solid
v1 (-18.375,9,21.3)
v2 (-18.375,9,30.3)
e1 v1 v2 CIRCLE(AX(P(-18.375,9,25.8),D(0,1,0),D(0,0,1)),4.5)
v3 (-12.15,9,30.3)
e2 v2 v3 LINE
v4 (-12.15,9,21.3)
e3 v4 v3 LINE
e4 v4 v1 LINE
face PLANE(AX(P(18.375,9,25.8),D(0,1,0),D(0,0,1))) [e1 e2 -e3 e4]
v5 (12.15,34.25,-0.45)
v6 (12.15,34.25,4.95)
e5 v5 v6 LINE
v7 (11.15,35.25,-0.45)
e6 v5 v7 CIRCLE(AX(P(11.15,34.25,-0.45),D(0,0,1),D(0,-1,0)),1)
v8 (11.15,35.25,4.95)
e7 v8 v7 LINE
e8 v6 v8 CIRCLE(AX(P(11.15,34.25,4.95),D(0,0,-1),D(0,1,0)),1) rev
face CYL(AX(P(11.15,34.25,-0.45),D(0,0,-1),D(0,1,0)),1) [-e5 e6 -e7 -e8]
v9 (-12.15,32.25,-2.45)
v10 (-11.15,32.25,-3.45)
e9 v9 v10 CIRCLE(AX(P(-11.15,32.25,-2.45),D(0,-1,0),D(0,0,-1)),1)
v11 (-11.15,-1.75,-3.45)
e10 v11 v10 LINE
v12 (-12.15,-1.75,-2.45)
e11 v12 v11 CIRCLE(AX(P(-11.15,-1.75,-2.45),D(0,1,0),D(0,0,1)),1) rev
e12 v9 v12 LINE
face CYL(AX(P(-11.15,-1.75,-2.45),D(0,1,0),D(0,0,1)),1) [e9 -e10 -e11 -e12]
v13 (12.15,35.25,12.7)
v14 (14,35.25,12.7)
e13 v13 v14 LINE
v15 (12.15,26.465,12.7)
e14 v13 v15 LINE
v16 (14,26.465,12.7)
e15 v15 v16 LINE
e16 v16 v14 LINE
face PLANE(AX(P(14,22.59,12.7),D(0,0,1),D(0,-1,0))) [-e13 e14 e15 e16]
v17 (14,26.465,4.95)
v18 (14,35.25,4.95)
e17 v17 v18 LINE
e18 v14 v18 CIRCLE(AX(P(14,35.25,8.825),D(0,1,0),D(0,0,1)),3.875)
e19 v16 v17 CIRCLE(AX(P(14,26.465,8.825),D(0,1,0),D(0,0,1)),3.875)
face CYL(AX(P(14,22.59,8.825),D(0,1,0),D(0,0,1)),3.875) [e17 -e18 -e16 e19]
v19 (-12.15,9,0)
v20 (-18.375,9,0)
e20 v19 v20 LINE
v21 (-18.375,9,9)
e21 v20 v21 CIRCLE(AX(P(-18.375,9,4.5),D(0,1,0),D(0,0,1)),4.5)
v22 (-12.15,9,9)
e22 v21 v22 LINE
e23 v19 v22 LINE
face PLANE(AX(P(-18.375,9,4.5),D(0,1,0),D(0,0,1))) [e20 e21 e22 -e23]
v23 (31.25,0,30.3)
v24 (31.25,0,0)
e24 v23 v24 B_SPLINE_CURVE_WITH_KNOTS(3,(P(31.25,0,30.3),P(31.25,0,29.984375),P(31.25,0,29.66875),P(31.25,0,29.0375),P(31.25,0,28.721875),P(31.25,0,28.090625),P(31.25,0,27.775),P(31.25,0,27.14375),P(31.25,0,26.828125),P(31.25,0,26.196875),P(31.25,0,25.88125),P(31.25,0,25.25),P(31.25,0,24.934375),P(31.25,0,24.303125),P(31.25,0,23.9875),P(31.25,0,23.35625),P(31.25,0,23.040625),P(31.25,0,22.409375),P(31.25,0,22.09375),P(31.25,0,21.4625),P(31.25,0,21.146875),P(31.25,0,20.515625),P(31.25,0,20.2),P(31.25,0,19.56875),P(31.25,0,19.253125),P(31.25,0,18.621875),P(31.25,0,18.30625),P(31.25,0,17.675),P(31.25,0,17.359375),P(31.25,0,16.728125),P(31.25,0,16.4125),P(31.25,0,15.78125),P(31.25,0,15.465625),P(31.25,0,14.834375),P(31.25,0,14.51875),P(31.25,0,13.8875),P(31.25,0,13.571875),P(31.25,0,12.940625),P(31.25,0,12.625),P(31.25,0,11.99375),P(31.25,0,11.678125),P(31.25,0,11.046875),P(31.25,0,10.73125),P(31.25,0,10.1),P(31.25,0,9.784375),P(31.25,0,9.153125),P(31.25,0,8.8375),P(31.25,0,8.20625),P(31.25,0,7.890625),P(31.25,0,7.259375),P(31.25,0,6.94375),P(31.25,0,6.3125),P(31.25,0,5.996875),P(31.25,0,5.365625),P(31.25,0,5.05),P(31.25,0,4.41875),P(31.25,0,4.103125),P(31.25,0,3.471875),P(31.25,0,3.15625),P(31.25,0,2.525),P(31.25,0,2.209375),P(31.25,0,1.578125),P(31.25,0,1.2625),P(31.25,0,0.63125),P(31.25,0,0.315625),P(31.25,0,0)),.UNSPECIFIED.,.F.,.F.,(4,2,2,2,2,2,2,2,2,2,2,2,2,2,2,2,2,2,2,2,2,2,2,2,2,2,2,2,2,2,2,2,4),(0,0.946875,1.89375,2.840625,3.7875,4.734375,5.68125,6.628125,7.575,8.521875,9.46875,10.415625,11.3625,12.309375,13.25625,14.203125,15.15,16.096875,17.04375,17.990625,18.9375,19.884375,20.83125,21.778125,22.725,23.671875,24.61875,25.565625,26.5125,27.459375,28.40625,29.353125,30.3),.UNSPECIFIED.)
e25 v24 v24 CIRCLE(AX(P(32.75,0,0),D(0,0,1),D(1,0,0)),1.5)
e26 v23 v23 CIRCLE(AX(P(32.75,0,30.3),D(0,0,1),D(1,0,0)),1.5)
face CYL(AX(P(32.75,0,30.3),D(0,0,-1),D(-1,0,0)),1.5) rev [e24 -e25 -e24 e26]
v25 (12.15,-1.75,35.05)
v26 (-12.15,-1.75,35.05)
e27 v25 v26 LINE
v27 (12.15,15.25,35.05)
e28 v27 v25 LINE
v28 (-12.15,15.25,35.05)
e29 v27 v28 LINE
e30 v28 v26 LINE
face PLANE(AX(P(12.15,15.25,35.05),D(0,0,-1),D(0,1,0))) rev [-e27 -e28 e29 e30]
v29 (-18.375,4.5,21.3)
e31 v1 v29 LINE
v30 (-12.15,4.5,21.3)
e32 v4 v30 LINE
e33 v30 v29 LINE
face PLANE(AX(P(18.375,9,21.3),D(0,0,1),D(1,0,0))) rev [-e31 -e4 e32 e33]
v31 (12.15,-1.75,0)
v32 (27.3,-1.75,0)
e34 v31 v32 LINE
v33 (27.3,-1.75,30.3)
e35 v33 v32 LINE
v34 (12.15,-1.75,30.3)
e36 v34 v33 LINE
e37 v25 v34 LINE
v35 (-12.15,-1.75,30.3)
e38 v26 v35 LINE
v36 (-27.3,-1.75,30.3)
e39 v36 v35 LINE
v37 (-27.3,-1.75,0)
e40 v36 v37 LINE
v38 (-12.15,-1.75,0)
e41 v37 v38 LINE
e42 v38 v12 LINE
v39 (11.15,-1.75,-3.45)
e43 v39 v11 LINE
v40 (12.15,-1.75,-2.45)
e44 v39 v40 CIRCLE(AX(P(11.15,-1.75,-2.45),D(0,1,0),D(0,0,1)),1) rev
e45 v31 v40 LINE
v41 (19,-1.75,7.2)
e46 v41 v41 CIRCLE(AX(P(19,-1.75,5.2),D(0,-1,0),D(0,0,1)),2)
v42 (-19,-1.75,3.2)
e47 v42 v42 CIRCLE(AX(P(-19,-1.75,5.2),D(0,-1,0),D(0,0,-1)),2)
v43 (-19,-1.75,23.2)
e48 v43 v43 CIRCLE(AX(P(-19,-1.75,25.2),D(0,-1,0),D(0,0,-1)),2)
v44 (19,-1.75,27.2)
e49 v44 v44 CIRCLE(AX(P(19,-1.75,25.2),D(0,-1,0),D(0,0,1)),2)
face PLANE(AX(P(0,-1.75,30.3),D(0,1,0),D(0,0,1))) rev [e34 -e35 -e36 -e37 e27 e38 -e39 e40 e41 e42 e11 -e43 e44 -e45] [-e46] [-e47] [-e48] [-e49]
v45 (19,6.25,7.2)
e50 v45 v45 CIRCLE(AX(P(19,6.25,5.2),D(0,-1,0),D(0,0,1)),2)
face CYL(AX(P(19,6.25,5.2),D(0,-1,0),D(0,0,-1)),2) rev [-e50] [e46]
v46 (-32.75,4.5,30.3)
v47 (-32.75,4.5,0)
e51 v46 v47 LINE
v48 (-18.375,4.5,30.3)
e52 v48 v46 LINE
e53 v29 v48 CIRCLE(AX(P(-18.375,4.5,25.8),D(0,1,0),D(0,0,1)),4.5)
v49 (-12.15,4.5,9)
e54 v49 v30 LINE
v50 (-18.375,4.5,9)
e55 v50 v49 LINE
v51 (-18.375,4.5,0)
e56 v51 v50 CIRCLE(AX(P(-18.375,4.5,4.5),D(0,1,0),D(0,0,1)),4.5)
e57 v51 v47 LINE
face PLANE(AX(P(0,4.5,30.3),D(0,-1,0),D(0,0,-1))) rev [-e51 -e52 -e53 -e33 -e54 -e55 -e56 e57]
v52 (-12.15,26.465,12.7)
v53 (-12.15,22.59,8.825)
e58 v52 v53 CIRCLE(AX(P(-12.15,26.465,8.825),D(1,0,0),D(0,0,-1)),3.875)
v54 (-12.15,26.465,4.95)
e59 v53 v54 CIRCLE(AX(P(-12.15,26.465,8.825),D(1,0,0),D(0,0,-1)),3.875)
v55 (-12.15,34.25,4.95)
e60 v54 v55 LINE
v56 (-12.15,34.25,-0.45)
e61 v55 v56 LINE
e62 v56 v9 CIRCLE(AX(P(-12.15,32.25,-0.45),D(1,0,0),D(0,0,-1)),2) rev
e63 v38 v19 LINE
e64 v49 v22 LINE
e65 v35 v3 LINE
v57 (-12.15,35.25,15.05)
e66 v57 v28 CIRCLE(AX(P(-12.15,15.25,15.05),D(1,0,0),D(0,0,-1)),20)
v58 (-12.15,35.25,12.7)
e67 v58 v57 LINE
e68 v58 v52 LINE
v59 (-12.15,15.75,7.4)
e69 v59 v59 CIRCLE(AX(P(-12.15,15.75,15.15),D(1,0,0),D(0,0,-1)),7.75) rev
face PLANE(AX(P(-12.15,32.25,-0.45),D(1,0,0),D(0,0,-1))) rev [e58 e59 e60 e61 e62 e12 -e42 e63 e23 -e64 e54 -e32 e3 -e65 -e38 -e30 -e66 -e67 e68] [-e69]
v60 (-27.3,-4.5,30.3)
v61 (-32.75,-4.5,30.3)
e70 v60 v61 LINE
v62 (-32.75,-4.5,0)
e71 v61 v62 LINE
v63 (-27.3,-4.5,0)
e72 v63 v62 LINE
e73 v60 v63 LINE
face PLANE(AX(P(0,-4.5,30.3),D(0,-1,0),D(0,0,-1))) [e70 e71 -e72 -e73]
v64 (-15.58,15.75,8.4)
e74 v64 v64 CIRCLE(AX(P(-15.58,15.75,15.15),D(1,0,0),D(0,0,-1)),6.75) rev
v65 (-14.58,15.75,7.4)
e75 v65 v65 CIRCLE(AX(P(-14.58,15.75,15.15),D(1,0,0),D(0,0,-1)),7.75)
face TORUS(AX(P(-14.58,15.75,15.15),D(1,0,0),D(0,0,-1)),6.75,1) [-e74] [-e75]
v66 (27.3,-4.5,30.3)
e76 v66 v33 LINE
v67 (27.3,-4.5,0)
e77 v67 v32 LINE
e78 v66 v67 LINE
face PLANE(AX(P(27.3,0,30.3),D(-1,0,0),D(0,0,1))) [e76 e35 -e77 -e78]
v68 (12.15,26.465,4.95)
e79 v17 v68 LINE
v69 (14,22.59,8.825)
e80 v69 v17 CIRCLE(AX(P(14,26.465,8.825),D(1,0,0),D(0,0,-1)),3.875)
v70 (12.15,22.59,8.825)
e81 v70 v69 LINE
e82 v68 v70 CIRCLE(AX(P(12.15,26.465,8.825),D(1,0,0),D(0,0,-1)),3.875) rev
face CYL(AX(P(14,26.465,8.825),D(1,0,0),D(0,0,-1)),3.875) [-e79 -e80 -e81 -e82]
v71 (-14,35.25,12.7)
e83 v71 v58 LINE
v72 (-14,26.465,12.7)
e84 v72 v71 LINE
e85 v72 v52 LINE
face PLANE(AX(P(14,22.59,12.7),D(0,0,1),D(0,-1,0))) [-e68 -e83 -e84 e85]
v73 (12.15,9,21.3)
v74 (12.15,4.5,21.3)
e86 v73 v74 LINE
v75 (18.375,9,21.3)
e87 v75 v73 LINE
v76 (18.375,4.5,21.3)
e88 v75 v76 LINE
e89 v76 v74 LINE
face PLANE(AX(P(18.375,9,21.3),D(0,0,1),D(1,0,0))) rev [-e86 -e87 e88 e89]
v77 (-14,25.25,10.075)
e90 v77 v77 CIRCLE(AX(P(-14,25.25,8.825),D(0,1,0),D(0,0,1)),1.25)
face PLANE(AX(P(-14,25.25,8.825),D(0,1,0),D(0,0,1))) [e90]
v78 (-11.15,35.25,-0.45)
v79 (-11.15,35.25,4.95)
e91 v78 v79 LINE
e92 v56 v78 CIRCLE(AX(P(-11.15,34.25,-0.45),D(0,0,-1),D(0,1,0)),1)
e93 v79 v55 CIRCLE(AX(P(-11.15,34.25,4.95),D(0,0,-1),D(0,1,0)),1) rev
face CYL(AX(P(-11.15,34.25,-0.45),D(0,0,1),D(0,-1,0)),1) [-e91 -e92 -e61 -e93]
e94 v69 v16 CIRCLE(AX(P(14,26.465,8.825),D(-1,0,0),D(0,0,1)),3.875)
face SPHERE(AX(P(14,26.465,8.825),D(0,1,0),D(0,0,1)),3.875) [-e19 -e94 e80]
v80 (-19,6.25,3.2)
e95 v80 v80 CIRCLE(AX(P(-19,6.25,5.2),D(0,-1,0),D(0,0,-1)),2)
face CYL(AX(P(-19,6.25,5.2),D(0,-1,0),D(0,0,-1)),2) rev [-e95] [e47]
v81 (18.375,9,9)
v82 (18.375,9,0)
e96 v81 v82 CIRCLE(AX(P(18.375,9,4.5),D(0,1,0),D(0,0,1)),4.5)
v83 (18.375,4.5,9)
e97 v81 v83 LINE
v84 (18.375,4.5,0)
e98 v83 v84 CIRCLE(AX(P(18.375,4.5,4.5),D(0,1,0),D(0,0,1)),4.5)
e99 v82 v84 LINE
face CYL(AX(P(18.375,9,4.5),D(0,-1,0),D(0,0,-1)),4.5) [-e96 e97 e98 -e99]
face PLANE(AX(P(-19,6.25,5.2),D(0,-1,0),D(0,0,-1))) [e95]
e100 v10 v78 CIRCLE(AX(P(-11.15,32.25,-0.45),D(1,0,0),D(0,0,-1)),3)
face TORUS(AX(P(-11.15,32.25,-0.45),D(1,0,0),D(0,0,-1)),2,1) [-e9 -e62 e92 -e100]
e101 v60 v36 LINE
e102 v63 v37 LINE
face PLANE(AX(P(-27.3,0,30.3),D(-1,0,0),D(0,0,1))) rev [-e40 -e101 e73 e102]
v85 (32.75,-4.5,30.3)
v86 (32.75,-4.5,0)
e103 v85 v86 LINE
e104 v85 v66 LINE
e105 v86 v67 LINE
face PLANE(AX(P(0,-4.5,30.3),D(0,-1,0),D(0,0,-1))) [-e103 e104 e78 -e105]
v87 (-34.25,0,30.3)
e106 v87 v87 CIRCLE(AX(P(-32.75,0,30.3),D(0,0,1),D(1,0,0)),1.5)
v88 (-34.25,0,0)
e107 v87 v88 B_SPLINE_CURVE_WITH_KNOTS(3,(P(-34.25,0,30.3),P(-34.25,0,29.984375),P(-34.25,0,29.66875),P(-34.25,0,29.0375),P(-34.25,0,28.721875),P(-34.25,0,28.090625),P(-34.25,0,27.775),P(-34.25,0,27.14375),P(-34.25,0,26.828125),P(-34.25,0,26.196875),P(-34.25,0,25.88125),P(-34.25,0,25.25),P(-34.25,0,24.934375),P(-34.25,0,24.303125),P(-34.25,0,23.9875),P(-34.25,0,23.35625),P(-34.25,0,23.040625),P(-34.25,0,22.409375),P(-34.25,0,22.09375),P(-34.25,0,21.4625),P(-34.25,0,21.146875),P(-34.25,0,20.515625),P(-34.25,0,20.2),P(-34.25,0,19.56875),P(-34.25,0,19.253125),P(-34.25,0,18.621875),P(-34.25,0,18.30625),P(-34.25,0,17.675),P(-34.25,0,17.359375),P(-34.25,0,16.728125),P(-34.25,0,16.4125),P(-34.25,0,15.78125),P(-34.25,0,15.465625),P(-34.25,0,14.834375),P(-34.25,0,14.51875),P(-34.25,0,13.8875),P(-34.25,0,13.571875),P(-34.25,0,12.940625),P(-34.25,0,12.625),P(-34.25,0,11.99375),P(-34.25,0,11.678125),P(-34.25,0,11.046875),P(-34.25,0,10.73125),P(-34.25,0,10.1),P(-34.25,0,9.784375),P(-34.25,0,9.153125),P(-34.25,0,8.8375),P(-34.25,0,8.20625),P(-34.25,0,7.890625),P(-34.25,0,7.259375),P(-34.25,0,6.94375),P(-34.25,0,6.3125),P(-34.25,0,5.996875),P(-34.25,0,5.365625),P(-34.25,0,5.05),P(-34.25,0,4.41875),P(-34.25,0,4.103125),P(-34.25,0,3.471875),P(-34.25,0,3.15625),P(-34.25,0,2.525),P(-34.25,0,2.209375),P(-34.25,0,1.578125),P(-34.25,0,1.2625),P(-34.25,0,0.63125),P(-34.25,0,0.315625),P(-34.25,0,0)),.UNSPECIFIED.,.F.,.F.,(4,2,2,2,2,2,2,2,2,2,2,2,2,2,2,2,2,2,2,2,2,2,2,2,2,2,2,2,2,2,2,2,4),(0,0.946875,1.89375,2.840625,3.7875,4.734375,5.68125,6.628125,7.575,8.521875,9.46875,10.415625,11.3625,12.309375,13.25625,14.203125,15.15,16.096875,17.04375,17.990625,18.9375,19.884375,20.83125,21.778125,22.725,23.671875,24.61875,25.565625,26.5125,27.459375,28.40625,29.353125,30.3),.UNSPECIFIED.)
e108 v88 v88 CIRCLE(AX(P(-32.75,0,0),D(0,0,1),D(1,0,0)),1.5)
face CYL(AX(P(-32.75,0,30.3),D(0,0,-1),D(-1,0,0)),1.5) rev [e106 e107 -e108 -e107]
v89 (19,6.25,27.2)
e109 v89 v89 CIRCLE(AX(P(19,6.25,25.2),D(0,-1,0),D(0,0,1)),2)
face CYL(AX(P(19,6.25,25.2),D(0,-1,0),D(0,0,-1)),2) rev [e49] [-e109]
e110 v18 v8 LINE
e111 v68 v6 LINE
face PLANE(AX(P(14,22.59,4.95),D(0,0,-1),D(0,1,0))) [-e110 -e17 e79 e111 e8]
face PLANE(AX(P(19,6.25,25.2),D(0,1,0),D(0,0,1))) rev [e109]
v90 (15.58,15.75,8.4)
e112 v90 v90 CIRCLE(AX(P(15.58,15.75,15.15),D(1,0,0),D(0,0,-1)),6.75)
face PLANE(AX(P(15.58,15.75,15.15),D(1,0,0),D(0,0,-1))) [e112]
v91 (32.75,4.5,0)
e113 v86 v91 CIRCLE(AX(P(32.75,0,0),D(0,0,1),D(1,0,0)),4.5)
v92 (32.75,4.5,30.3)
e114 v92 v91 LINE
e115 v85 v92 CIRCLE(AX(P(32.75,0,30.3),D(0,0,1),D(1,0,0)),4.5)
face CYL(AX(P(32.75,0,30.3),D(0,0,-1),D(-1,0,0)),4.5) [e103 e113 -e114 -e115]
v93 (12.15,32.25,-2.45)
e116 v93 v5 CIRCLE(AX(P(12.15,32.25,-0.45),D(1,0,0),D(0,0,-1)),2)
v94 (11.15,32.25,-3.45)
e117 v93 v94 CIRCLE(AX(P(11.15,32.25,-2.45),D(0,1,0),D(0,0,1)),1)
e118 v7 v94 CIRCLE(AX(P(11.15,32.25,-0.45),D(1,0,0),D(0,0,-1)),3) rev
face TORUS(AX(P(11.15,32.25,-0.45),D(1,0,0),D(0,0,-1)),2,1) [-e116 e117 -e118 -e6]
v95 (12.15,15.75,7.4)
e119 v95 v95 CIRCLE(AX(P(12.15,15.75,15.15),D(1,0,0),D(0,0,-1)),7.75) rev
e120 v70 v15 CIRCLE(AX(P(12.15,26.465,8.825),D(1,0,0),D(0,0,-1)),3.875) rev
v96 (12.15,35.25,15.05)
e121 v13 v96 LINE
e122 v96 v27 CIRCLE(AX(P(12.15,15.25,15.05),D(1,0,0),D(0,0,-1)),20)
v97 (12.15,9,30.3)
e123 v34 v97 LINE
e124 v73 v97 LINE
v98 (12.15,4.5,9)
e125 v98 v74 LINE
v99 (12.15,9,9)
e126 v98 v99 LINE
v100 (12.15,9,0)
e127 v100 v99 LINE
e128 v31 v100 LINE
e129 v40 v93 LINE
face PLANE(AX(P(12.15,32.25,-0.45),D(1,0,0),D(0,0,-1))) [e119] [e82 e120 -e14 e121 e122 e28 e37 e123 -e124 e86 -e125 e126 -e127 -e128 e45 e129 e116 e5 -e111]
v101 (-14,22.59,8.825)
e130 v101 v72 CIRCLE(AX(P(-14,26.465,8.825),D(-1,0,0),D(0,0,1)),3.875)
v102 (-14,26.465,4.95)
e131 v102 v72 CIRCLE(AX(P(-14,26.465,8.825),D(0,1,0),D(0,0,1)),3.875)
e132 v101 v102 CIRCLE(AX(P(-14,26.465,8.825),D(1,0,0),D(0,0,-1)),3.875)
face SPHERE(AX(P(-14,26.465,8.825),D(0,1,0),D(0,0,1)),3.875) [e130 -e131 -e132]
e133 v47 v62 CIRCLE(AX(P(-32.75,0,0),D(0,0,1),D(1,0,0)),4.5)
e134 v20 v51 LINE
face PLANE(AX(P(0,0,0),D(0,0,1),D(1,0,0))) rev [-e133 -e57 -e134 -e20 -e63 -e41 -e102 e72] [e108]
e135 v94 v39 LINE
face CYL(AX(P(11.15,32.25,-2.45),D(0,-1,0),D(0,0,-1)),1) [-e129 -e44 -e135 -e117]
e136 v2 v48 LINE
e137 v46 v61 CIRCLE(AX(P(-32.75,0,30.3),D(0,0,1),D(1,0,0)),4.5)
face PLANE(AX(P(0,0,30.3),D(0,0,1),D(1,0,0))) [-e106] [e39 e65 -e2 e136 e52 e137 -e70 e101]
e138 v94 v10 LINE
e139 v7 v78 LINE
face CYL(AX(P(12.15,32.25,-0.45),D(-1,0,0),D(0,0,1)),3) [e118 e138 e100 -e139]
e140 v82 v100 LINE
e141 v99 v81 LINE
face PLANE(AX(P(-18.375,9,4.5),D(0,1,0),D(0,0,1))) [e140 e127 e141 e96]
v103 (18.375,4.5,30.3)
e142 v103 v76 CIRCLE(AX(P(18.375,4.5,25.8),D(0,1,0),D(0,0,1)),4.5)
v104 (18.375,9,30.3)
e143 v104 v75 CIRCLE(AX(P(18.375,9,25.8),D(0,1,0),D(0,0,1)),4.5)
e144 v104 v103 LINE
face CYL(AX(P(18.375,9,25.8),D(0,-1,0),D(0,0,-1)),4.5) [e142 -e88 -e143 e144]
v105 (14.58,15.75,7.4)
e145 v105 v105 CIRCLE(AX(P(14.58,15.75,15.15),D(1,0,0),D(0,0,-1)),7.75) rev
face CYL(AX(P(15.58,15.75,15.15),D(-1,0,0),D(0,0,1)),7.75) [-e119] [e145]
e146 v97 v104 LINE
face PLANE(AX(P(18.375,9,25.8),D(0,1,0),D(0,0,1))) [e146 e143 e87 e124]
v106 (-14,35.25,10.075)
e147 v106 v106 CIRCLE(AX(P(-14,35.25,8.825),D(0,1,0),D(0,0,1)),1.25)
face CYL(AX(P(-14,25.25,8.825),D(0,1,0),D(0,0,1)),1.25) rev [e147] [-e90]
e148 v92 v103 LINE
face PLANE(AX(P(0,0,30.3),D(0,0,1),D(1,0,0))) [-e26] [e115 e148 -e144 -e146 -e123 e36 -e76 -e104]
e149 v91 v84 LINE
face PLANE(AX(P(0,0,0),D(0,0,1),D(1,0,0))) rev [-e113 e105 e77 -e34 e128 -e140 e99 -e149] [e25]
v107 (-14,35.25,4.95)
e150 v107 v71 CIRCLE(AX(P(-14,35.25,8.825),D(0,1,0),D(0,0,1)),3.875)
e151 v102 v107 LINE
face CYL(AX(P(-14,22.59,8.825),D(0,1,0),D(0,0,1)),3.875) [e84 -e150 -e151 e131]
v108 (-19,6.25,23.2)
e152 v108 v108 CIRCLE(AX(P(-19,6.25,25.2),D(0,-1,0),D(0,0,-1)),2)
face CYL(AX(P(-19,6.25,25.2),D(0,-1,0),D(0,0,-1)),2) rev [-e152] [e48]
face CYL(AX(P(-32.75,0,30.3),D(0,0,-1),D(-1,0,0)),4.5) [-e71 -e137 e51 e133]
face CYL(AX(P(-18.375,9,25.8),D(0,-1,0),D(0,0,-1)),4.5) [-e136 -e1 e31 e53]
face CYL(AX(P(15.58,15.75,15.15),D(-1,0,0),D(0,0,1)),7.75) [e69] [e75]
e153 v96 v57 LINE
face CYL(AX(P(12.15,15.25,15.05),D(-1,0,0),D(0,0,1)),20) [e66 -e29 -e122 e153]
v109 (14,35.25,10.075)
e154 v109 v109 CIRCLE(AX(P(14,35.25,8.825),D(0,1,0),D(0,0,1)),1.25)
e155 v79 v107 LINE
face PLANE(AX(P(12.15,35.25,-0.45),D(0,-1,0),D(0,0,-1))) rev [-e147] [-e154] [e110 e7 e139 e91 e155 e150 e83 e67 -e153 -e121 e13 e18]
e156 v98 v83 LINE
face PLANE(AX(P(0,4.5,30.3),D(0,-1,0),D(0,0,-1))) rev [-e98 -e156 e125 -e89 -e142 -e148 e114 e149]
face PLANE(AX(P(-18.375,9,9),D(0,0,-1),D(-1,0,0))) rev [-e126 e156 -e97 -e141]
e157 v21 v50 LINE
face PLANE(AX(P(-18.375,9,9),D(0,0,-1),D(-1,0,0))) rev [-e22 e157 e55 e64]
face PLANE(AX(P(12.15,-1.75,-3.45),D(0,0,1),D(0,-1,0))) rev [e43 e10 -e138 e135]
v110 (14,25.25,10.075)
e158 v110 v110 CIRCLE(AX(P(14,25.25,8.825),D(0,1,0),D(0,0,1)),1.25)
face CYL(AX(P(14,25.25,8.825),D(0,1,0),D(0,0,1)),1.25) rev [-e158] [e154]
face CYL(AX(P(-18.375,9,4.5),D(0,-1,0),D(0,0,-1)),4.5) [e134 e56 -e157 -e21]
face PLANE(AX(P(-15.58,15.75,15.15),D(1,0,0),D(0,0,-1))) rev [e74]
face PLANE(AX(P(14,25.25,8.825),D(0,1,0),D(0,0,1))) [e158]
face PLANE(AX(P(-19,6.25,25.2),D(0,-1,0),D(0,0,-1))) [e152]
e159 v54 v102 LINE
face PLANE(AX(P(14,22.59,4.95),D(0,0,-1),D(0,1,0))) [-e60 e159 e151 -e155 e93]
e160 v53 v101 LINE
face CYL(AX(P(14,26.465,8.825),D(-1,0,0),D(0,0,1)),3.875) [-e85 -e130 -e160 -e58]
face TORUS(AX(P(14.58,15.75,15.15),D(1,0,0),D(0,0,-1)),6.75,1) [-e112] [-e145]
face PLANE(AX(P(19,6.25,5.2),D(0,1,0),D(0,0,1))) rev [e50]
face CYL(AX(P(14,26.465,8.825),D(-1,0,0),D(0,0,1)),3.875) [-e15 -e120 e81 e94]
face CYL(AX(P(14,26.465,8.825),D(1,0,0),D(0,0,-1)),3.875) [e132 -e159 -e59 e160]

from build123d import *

# Parameters (mm, degrees)
SKETCH1_R           = 1.5
BOSS_EXTRUDE1_DEPTH = 30.3
BOSS_EXTRUDE2_DEPTH = 12.15
BOSS_EXTRUDE3_DEPTH = 12.66
FILLET1_R           = 3.875
BOSS_EXTRUDE4_DEPTH = 4.5
SKETCH5_R           = 1.25
CUT_EXTRUDE1_DEPTH  = 10
SKETCH6_R           = 7.75
BOSS_EXTRUDE5_DEPTH = 15.58
FILLET2_R           = 1
FILLET3_R           = 1
SKETCH7_R           = 2
CUT_EXTRUDE2_DEPTH  = 8


with BuildPart() as part:
    # Sketch1 → Boss-Extrude1 (new body)
    with BuildSketch(Plane.XY):
        with BuildLine():
            Line((27.3, -4.5), (32.75, -4.5))
            ThreePointArc((32.75, -4.5), (37.25, 0), (32.75, 4.5))
            Line((32.75, 4.5), (-32.75, 4.5))
            ThreePointArc((-32.75, 4.5), (-37.25, 0), (-32.75, -4.5))
            Line((-32.75, -4.5), (-27.3, -4.5))
            Line((-27.3, -4.5), (-27.3, -1.75))
            Line((-27.3, -1.75), (27.3, -1.75))
            Line((27.3, -1.75), (27.3, -4.5))
        make_face()
        with Locations(Location((-32.75, 0, 0), (0, 0, 180))):
            Circle(SKETCH1_R, mode=Mode.SUBTRACT)
        with Locations(Location((32.75, 0, 0), (0, 0, 180))):
            Circle(SKETCH1_R, mode=Mode.SUBTRACT)
    extrude(amount=BOSS_EXTRUDE1_DEPTH)

    # Sketch2 → Boss-Extrude2 (add, symmetric)
    with BuildSketch(Plane(origin=(0, 0, 0), x_dir=(0, 0, -1), z_dir=(1, 0, 0))):
        with BuildLine():
            Line((-35.05, -1.75), (3.45, -1.75))
            Line((3.45, -1.75), (3.45, 32.25))
            ThreePointArc((3.45, 32.25), (2.571320344, 34.371320344), (0.45, 35.25))
            Line((0.45, 35.25), (-15.05, 35.25))
            ThreePointArc((-15.05, 35.25), (-29.192135624, 29.392135624), (-35.05, 15.25))
            Line((-35.05, 15.25), (-35.05, -1.75))
        make_face()
    extrude(amount=BOSS_EXTRUDE2_DEPTH, both=True)

    # Sketch3 → Boss-Extrude3 (add)
    with BuildSketch(Plane(origin=(0, 35.25, 0), x_dir=(1, 0, 0), z_dir=(0, 1, 0))):
        with BuildLine():
            Line((14, -12.7), (-14, -12.7))
            ThreePointArc((-14, -12.7), (-17.875, -8.825), (-14, -4.95))
            Line((-14, -4.95), (14, -4.95))
            ThreePointArc((14, -4.95), (17.875, -8.825), (14, -12.7))
        make_face()
    extrude(amount=-BOSS_EXTRUDE3_DEPTH)

    # Fillet1
    fillet1_edges = [part.edges().sort_by_distance(p)[0] for p in [
        (-13.075, 22.59, 4.95),
        (-13.075, 22.59, 12.7),
        (13.075, 22.59, 12.7),
        (13.075, 22.59, 4.95),
        (-17.875, 22.59, 8.825),
        (17.875, 22.59, 8.825),
    ]]
    fillet(fillet1_edges, radius=FILLET1_R - 0.0001)  # a hair under: the kernel refuses the full size

    # Sketch4 → Boss-Extrude4 (add)
    with BuildSketch(Plane(origin=(0, 4.5, 0), x_dir=(1, 0, 0), z_dir=(0, 1, 0))):
        with BuildLine():
            Line((-18.375, 0), (18.375, 0))
            ThreePointArc((18.375, 0), (22.875, -4.5), (18.375, -9))
            Line((18.375, -9), (-18.375, -9))
            ThreePointArc((-18.375, -9), (-22.875, -4.5), (-18.375, 0))
        make_face()
        with BuildLine():
            Line((18.375, -30.3), (-18.375, -30.3))
            ThreePointArc((-18.375, -30.3), (-22.875, -25.8), (-18.375, -21.3))
            Line((-18.375, -21.3), (18.375, -21.3))
            ThreePointArc((18.375, -21.3), (22.875, -25.8), (18.375, -30.3))
        make_face()
    extrude(amount=BOSS_EXTRUDE4_DEPTH)

    # Sketch5 → Cut-Extrude1 (cut)
    with BuildSketch(Plane(origin=(0, 35.25, 0), x_dir=(1, 0, 0), z_dir=(0, 1, 0))):
        with Locations(Location((14, -8.825, 0), (0, 0, 270))):
            Circle(SKETCH5_R)
        with Locations(Location((-14, -8.825, 0), (0, 0, 270))):
            Circle(SKETCH5_R)
    extrude(amount=-CUT_EXTRUDE1_DEPTH, mode=Mode.SUBTRACT)

    # Sketch6 → Boss-Extrude5 (add, symmetric)
    with BuildSketch(Plane(origin=(0, 0, 0), x_dir=(0, 0, -1), z_dir=(1, 0, 0))):
        with Locations((-15.15, 15.75)):
            Circle(SKETCH6_R)
    extrude(amount=BOSS_EXTRUDE5_DEPTH, both=True)

    # Fillet2
    fillet2_edges = [part.edges().sort_by_distance(p)[0] for p in [
        (-15.58, 15.75, 22.9),
        (15.58, 15.75, 22.9),
    ]]
    fillet(fillet2_edges, radius=FILLET2_R)

    # Fillet3
    fillet3_edges = [part.edges().sort_by_distance(p)[0] for p in [
        (-12.15, 15.25, -3.45),
        (-12.15, 34.371320344, -2.571320344),
        (-12.15, 35.25, 2.25),
        (12.15, 15.25, -3.45),
        (12.15, 34.371320344, -2.571320344),
        (12.15, 35.25, 2.25),
    ]]
    fillet(fillet3_edges, radius=FILLET3_R)

    # Sketch7 → Cut-Extrude2 (cut)
    with BuildSketch(Plane.XZ.offset(1.75)):
        with Locations(Location((-19, 5.2, 0), (0, 0, 270))):
            Circle(SKETCH7_R)
        with Locations(Location((-19, 25.2, 0), (0, 0, 270))):
            Circle(SKETCH7_R)
        with Locations(Location((19, 5.2, 0), (0, 0, 90))):
            Circle(SKETCH7_R)
        with Locations(Location((19, 25.2, 0), (0, 0, 90))):
            Circle(SKETCH7_R)
    extrude(amount=-CUT_EXTRUDE2_DEPTH, mode=Mode.SUBTRACT)


solid = part.part
